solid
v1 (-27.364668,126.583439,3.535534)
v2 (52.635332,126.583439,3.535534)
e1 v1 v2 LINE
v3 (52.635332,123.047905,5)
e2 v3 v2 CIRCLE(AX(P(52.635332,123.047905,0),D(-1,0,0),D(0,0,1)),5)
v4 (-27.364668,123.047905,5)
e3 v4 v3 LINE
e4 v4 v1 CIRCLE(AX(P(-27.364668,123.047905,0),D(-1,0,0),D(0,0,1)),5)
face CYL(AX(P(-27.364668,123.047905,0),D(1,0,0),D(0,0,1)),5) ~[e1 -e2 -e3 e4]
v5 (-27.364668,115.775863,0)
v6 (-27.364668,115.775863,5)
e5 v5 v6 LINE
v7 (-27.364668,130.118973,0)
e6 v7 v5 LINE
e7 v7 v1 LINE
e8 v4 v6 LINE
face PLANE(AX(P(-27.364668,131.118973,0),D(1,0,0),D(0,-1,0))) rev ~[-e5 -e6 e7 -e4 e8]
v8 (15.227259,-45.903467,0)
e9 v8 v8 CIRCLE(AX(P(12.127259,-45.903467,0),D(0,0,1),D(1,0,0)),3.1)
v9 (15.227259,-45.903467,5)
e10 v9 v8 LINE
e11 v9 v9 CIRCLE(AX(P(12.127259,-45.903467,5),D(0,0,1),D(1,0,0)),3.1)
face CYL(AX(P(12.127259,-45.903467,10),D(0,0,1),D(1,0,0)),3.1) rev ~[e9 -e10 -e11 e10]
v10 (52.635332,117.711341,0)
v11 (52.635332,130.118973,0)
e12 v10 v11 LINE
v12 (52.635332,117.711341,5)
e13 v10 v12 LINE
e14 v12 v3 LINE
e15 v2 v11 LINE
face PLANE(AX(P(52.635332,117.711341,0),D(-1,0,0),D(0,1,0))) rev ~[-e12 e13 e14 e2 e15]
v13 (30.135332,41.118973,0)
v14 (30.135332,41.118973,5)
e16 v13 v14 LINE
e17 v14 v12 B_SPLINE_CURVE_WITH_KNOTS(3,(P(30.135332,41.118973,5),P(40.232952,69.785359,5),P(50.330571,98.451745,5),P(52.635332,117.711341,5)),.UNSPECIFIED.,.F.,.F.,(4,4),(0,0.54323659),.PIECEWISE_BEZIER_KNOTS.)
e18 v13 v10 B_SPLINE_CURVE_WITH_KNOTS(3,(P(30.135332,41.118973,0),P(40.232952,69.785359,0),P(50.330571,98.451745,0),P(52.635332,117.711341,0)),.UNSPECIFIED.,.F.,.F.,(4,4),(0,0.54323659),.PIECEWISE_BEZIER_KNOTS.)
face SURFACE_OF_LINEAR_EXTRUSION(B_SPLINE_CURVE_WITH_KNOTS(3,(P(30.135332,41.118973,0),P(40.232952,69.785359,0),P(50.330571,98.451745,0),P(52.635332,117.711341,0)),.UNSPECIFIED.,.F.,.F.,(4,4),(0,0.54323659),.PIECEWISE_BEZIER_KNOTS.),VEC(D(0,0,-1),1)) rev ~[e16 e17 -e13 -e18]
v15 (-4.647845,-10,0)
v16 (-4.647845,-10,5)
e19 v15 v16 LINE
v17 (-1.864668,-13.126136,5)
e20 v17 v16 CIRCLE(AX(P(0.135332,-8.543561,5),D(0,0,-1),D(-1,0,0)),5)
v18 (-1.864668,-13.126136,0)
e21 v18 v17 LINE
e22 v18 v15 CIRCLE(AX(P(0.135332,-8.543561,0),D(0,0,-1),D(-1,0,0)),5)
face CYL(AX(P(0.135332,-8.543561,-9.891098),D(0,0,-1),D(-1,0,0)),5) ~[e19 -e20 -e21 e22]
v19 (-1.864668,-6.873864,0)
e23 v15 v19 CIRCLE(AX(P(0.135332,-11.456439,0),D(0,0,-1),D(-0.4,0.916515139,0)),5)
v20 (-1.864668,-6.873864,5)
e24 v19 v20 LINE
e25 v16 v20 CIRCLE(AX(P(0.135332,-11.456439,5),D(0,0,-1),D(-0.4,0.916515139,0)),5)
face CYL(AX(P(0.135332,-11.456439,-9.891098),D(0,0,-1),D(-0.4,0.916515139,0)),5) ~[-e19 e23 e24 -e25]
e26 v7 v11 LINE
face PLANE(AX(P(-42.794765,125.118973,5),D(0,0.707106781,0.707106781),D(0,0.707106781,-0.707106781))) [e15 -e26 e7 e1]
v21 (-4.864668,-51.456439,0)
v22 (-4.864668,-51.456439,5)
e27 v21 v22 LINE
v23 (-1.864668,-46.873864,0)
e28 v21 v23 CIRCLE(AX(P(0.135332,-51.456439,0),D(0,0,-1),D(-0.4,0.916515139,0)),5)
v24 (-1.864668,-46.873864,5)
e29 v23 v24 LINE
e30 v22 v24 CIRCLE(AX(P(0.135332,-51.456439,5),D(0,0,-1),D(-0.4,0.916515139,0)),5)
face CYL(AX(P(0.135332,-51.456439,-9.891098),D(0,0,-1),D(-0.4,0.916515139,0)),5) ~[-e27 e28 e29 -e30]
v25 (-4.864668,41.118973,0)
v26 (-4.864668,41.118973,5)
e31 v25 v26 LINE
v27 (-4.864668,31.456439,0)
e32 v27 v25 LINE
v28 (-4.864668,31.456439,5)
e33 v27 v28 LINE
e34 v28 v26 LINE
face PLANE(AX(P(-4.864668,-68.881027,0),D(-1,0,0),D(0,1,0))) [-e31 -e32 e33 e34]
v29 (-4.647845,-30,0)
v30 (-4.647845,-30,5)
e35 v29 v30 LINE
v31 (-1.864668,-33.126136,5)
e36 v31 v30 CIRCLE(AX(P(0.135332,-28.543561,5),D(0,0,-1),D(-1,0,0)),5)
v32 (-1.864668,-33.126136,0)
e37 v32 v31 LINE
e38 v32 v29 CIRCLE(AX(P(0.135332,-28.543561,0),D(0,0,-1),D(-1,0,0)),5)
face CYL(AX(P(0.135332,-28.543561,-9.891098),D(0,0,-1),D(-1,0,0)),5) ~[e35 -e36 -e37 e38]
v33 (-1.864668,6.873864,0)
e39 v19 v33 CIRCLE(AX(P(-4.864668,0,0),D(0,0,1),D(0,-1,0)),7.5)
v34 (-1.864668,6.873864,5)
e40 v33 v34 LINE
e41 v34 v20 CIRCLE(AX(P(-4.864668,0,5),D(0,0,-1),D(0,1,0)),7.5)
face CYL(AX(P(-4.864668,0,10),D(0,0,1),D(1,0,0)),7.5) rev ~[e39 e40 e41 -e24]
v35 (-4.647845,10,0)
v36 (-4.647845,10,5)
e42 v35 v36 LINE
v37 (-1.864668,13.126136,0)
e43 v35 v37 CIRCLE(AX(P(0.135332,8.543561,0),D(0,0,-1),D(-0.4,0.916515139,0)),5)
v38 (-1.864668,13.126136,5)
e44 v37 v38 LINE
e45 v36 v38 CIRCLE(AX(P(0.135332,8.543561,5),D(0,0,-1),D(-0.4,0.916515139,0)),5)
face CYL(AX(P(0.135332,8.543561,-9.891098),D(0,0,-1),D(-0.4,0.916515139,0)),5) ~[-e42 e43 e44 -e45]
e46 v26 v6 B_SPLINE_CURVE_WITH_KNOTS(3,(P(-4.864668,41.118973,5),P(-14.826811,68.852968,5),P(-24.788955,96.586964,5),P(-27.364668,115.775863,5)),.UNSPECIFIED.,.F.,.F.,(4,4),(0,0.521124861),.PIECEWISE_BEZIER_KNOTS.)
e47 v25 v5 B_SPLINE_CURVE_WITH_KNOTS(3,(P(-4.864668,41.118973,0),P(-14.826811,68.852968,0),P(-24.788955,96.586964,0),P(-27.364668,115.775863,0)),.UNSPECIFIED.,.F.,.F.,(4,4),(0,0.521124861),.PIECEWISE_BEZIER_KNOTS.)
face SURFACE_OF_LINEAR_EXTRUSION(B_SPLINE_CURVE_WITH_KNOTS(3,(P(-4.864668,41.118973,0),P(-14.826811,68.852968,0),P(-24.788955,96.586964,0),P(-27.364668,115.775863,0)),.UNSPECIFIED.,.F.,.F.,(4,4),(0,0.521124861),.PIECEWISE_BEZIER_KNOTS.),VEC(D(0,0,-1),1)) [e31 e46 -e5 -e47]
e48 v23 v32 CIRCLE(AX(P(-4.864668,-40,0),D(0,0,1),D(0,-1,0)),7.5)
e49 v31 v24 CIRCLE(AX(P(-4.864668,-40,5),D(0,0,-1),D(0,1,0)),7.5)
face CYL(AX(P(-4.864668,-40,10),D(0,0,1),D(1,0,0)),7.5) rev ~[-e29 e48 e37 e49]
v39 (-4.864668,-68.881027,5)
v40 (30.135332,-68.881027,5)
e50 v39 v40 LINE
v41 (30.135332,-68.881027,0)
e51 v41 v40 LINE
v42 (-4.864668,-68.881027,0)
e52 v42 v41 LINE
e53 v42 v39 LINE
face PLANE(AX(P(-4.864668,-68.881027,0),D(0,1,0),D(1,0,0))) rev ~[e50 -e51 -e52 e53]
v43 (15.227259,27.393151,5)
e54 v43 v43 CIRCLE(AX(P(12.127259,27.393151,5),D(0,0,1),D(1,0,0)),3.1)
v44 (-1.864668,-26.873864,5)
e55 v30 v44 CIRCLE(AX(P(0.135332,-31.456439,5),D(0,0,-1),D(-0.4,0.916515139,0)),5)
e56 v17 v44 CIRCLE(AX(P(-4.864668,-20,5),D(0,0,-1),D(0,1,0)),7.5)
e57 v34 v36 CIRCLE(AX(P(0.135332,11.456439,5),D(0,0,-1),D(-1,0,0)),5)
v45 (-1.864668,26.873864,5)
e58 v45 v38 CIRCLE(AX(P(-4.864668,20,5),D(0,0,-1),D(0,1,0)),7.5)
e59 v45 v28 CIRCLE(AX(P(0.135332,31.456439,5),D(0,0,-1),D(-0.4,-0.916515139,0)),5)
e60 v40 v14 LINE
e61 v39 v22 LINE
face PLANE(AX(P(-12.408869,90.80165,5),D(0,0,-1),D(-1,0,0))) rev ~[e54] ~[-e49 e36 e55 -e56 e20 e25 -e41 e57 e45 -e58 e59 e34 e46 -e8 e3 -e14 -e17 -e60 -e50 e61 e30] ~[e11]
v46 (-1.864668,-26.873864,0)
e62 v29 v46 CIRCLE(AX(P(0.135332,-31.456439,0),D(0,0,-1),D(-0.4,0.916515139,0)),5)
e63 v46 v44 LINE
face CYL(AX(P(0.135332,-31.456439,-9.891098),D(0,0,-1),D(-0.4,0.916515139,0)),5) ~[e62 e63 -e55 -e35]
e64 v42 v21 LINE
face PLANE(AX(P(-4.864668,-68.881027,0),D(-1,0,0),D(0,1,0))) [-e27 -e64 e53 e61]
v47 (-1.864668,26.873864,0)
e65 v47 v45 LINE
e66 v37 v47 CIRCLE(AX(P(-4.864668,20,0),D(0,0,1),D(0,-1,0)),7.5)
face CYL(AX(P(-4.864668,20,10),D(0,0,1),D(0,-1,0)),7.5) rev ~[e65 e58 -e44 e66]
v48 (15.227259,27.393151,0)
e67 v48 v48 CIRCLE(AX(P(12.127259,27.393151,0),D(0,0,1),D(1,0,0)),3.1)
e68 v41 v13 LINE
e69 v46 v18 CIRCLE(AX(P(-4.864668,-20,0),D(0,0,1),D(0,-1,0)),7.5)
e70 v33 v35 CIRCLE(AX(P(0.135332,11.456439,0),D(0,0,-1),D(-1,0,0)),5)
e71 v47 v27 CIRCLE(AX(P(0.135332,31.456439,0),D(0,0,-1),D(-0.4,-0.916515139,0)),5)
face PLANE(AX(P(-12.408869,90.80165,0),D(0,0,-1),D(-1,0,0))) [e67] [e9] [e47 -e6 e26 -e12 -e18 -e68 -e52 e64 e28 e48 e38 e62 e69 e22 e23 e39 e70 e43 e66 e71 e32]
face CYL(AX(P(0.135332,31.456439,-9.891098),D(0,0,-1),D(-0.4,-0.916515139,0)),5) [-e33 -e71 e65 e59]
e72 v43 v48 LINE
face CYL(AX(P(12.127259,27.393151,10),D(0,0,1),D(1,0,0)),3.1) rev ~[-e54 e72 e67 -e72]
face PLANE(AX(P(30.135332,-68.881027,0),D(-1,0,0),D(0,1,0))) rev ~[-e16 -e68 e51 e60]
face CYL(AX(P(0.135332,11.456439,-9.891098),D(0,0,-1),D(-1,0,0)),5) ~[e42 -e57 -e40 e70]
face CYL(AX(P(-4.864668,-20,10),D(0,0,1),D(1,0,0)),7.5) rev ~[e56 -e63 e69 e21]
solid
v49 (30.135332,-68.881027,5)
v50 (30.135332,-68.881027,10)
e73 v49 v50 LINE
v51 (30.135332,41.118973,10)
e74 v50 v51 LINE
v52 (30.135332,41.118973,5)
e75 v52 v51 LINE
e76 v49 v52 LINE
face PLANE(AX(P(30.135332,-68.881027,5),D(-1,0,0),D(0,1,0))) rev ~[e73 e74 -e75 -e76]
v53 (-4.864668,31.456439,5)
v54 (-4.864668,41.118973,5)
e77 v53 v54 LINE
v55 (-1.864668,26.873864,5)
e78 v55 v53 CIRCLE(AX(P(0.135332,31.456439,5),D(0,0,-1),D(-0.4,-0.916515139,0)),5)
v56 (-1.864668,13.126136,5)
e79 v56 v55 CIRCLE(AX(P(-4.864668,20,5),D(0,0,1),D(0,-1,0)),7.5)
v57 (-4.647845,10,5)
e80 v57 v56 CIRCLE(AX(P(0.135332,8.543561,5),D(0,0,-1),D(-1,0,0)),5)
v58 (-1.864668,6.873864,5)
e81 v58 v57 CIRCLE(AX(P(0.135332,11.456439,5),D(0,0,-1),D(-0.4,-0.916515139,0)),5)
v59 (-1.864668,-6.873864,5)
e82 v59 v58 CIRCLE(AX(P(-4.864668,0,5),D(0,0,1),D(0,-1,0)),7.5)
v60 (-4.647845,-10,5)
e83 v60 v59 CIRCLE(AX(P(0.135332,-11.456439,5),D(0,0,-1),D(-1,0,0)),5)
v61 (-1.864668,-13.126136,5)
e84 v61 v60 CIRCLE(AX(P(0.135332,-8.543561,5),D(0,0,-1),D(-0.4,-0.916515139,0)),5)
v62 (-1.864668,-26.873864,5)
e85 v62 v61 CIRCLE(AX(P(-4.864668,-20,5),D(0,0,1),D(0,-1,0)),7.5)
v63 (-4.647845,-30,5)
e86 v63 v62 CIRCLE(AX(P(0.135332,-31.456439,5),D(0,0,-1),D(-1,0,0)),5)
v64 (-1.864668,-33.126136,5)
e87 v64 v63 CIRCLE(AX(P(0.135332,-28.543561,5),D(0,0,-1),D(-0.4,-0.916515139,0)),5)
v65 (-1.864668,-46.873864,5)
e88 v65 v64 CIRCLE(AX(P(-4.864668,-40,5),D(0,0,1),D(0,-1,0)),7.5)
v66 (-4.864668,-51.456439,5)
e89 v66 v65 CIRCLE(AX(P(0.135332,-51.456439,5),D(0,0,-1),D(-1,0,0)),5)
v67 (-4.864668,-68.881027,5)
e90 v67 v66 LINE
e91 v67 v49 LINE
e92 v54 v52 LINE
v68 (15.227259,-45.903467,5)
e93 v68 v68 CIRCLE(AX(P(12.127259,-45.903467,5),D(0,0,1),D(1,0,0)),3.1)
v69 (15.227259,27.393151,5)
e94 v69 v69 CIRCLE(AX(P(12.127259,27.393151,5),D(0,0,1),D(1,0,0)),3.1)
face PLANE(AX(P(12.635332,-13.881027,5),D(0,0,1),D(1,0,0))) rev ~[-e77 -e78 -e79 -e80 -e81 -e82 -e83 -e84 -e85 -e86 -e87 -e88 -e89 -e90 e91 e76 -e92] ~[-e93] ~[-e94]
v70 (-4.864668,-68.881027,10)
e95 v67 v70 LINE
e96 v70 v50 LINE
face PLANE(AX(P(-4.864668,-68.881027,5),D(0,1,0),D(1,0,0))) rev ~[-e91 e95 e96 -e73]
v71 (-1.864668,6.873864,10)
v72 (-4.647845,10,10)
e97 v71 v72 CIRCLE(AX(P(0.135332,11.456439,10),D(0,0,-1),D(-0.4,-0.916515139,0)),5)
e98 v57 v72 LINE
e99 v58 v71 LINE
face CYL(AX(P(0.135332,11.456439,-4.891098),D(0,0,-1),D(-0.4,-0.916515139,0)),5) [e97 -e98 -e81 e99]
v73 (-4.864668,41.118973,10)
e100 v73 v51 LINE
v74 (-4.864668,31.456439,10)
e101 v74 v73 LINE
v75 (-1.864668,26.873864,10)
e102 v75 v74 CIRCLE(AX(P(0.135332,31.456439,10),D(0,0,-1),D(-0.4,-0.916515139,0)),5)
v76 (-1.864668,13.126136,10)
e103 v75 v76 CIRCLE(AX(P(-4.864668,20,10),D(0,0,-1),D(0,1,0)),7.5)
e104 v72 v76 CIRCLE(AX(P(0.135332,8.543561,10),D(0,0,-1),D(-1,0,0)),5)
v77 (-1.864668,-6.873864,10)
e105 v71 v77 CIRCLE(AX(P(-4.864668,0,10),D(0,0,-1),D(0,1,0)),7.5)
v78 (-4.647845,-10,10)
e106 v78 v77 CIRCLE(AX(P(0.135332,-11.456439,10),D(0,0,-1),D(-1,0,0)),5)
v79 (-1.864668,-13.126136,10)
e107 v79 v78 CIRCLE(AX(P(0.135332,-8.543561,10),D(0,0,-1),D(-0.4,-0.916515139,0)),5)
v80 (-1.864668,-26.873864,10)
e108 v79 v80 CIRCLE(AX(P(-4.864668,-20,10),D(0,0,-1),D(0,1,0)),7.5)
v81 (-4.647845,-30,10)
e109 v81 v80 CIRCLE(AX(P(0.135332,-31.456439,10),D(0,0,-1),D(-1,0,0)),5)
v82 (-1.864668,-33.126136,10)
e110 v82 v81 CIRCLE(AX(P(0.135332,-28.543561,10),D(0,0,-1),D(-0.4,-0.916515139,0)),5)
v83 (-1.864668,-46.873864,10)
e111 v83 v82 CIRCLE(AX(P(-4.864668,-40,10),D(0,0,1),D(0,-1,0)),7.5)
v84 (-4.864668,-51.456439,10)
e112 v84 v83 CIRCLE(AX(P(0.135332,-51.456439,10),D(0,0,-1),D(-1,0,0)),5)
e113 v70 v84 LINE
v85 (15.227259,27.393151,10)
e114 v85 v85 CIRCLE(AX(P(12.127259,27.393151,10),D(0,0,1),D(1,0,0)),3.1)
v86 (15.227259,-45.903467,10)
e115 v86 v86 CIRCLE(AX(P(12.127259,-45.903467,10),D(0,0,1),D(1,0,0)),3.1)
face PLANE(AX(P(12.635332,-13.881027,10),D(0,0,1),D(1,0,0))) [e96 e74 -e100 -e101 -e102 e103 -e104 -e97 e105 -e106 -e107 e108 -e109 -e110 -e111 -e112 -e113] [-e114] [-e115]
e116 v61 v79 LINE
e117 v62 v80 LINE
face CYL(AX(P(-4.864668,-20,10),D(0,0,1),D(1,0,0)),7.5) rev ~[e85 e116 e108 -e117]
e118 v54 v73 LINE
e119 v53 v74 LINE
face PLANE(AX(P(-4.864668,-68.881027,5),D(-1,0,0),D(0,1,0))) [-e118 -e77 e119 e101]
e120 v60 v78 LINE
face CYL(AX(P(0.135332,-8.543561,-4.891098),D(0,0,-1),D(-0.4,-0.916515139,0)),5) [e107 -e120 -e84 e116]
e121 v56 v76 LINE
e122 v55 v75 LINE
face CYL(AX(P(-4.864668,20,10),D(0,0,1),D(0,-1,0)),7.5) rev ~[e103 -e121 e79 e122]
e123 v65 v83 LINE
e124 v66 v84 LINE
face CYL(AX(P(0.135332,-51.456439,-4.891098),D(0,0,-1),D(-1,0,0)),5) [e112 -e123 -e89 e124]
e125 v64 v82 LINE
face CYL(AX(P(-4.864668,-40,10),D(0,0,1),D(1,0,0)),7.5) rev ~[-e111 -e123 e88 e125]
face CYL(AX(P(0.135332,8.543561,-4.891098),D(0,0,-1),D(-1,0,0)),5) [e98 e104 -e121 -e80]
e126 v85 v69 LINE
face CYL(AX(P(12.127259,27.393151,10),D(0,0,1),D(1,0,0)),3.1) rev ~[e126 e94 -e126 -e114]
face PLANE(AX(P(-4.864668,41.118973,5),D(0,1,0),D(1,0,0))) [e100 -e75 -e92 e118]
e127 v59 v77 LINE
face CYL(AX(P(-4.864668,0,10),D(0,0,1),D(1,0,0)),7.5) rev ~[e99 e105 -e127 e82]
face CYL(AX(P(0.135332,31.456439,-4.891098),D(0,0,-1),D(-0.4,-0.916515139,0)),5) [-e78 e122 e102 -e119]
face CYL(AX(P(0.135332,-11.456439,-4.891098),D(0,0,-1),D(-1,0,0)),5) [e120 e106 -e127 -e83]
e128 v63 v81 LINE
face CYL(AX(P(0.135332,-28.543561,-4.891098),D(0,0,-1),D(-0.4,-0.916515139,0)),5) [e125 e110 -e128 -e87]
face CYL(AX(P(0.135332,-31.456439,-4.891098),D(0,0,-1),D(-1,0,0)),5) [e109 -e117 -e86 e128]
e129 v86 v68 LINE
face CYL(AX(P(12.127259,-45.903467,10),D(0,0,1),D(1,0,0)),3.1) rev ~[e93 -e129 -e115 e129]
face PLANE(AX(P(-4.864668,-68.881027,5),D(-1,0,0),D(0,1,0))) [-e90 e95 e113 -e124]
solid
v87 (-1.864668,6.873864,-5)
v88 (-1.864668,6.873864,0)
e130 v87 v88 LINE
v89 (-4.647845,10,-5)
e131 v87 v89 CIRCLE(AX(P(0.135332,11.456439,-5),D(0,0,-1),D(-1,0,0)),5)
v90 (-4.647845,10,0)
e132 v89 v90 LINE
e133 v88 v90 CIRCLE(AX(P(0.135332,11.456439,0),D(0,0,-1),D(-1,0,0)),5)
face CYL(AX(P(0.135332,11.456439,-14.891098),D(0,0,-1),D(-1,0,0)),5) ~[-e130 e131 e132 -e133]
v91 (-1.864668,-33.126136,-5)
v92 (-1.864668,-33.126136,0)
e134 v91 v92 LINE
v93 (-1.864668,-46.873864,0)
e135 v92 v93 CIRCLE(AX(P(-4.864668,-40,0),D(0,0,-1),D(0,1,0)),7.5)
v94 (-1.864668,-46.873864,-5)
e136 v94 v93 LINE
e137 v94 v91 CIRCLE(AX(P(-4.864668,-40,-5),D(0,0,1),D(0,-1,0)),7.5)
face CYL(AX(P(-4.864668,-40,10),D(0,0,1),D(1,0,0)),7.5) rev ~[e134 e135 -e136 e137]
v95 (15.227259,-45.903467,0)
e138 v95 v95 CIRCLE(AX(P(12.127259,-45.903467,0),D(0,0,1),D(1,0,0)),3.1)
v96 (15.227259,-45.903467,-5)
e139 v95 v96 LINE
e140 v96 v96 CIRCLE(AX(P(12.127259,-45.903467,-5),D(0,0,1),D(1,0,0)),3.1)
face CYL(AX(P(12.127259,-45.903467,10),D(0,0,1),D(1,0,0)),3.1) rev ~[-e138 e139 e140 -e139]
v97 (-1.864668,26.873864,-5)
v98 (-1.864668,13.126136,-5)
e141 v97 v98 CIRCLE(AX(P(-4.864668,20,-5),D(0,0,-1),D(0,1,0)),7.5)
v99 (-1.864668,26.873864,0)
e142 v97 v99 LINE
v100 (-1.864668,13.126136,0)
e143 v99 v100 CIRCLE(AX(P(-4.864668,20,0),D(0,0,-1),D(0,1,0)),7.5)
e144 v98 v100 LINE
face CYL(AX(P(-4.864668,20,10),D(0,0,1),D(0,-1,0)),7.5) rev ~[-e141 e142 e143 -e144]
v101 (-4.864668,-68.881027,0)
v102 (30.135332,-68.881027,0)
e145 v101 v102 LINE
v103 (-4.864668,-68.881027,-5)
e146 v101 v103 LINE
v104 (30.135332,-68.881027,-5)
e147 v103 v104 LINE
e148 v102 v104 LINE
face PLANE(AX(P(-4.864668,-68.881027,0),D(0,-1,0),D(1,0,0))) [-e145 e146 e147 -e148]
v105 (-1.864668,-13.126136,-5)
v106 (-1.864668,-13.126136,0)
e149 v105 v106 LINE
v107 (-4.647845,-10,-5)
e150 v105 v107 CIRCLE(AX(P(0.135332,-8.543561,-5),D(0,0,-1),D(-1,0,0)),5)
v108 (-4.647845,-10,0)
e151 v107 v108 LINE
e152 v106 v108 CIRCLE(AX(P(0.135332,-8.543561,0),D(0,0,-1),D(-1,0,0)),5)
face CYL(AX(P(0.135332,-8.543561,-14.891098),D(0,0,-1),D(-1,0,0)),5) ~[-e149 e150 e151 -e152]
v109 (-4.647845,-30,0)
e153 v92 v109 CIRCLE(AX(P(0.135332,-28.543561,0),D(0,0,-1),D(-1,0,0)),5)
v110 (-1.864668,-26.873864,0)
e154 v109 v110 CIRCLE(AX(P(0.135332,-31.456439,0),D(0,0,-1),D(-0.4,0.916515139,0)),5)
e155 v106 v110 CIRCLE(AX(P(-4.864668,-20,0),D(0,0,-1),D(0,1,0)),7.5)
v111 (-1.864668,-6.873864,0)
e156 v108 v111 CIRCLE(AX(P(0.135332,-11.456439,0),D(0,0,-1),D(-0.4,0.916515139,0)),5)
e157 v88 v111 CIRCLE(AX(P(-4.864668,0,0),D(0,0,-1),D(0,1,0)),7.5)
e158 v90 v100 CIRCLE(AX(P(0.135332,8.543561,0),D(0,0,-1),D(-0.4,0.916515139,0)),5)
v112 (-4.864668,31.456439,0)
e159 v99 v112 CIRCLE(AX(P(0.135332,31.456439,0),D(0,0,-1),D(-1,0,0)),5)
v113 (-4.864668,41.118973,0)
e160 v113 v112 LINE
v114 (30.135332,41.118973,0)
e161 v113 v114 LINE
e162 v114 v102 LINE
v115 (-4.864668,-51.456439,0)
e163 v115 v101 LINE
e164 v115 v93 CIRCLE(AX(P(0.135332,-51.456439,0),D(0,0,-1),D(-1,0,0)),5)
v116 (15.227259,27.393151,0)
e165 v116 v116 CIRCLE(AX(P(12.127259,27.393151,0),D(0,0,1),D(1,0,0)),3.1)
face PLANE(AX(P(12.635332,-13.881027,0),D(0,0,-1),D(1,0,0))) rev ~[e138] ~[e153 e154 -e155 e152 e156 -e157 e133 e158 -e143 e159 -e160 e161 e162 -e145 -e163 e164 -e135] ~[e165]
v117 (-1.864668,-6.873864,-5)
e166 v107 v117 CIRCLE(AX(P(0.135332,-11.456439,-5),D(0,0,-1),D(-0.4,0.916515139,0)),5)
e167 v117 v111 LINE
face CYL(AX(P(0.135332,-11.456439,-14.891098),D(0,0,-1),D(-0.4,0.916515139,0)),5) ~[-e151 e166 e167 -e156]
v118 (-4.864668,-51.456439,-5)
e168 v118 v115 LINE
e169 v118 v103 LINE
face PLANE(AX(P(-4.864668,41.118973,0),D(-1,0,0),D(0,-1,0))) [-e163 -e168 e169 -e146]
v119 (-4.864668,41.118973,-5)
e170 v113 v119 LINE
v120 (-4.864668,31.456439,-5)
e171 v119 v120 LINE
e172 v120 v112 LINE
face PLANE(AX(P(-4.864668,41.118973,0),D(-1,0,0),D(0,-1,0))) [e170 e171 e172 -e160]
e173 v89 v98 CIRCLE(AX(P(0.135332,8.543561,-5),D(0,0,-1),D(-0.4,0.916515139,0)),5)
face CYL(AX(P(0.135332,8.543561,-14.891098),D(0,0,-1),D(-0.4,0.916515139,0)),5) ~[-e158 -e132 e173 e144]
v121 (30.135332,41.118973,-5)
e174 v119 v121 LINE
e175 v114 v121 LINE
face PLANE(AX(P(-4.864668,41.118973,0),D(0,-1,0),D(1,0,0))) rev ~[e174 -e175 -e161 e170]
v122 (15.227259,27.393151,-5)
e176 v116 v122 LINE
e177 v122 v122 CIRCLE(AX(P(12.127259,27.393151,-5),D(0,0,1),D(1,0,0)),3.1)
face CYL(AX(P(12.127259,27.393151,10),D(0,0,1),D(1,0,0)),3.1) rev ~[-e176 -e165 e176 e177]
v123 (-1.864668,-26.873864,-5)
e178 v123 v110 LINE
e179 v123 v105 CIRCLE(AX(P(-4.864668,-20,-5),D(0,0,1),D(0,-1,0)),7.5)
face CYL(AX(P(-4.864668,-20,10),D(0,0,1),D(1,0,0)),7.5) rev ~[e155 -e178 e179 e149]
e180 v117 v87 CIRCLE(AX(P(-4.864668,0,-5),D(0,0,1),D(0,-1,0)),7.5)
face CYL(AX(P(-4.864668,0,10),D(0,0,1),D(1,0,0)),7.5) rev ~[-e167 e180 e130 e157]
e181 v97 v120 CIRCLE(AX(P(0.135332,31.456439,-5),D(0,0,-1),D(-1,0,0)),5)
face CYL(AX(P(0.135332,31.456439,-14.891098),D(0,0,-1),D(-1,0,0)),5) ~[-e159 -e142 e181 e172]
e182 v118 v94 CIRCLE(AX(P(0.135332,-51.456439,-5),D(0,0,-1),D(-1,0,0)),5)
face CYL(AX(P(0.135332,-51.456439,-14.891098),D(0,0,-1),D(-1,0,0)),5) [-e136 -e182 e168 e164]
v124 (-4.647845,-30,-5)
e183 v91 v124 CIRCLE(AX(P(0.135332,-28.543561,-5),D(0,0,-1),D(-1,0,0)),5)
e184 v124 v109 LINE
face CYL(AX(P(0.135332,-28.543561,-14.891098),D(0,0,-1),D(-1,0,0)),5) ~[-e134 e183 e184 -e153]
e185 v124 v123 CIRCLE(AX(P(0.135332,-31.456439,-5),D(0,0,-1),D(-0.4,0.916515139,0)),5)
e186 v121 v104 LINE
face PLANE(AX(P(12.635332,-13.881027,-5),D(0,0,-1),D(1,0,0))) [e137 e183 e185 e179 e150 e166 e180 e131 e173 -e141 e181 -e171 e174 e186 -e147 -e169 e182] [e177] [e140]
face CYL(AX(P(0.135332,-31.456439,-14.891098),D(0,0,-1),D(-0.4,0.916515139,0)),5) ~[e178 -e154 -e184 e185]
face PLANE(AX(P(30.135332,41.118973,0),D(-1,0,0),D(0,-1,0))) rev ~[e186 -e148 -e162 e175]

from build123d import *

# Parameters (mm, degrees)
F0_W          = 35
F0_H          = 90
F0_H_2        = 110
F1_DEPTH      = 5
F2_W          = 35
F2_H          = 110
F4_DEPTH      = 5
F3_W          = 35
F3_H          = 110
F5_DEPTH      = 5
F7_DEPTH      = 25
F6_R          = 7.5
F8_DEPTH      = 25
F9_T1_DEPTH   = 24.7821961869
F9_2_T1_DEPTH = 24.7821961869
F9_3_T1_DEPTH = 24.7821961869
F10_R         = 3.1
F11_DEPTH     = 25
F12_DEPTH     = 25
F13_T1_DEPTH  = 110.8601958556
F14_R         = 5


# Not quite as in the source:
# - a fillet or chamfer that OpenCascade refuses, or shapes differently, is made with other operations: its cross-section is extruded or revolved along the edge and cut away or added


with BuildPart() as f1:
    # F0 (on Top) → F1 (new body)
    with BuildSketch(Plane.XY):
        with BuildLine():
            add(Edge.make_bspline(
                [(-4.864667505, 41.1189725995), (-14.8268111493, 68.8529683822), (-24.7889547935, 96.5869641649), (-27.364667505, 115.7758631074)],
                knots=[0, 0, 0, 0, 0.5211248606, 0.5211248606, 0.5211248606, 0.5211248606], degree=3))
            Line((-4.864667505, 41.1189725995), (-4.864667505, 131.1189725995))
            Line((-4.864667505, 131.1189725995), (-27.364667505, 131.1189725995))
            Line((-27.364667505, 131.1189725995), (-27.364667505, 115.7758631074))
        make_face()
        with Locations((12.635332495, 86.1189725995)):
            Rectangle(F0_W, F0_H)
        with BuildLine():
            Line((30.135332495, 131.1189725995), (30.135332495, 41.1189725995))
            add(Edge.make_bspline(
                [(30.135332495, 41.1189725995), (40.232951817, 69.7853589458), (50.330571139, 98.4517452921), (52.635332495, 117.7113411352)],
                knots=[0, 0, 0, 0, 0.5432365903, 0.5432365903, 0.5432365903, 0.5432365903], degree=3))
            Line((52.635332495, 117.7113411352), (52.635332495, 131.1189725995))
            Line((52.635332495, 131.1189725995), (30.135332495, 131.1189725995))
        make_face()
        with Locations((12.635332495, -13.8810274005)):
            Rectangle(F0_W, F0_H_2)
    extrude(amount=F1_DEPTH)


with BuildPart() as f4:
    # F2 (on face) → F4 (new body)
    with BuildSketch(Plane.XY.offset(5)):
        with Locations((12.635332495, -13.8810274005)):
            Rectangle(F2_W, F2_H)
    extrude(amount=F4_DEPTH)


with BuildPart() as f5:
    # F3 (on face) → F5 (new body)
    with BuildSketch(Plane(origin=(0, 0, 0), x_dir=(1, 0, 0), z_dir=(0, 0, -1))):
        with Locations((12.635332495, 13.8810274005)):
            Rectangle(F3_W, F3_H)
    extrude(amount=F5_DEPTH)


with BuildPart() as f7_tool:
    # F6 (on face) → F7 (new body)
    with BuildSketch(Plane.XY.offset(10)):
        with BuildLine():
            ThreePointArc((-4.864667505, 12.5), (0.4386333539, 14.6966991411), (2.635332495, 20))
            ThreePointArc((2.635332495, 20), (0.4386333539, 25.3033008589), (-4.864667505, 27.5))
            Line((-4.864667505, 27.5), (-4.864667505, 12.5))
        make_face()
    extrude(amount=-F7_DEPTH)


with BuildPart() as f1_1:
    add(f1.part)

    # F7: cut by f7_tool
    add(f7_tool.part, mode=Mode.SUBTRACT)


with BuildPart() as f4_1:
    add(f4.part)

    # F7: cut by f7_tool
    add(f7_tool.part, mode=Mode.SUBTRACT)


with BuildPart() as f5_1:
    add(f5.part)

    # F7: cut by f7_tool
    add(f7_tool.part, mode=Mode.SUBTRACT)


with BuildPart() as f8_tool:
    # F6 (on face) → F8 (new body)
    with BuildSketch(Plane.XY.offset(10)):
        with Locations((-4.864667505, 20)):
            Circle(F6_R)
        with Locations((-4.864667505, 0)):
            Circle(F6_R)
        with Locations((-4.864667505, -20)):
            Circle(F6_R)
        with Locations((-4.864667505, -40)):
            Circle(F6_R)
    extrude(amount=-F8_DEPTH)


with BuildPart() as f1_2:
    add(f1_1.part)

    # F8: cut by f8_tool
    add(f8_tool.part, mode=Mode.SUBTRACT)

    # F9: fillet of radius 5 on 8 edges, made by hand

    # F9_s2 → F9_t1 (cut)
    with BuildSketch(Plane.XY.offset(-9.8910980935)):
        with BuildLine():
            ThreePointArc((-1.864667505, 26.8738635424), (-4.0479676377, 28.7178264499), (-4.864667505, 31.4564392374))
            Line((-4.864667505, 31.4564392374), (-4.864667505, 27.5))
            ThreePointArc((-4.864667505, 27.5), (-3.3323451774, 27.341797347), (-1.864667505, 26.8738635424))
        make_face()
        with BuildLine():
            ThreePointArc((-1.864667505, 13.1261364576), (-4.0479676377, 11.2821735501), (-4.864667505, 8.5435607626))
            Line((-4.864667505, 8.5435607626), (-4.864667505, 12.5))
            ThreePointArc((-4.864667505, 12.5), (-3.3323451774, 12.658202653), (-1.864667505, 13.1261364576))
        make_face()
        with BuildLine():
            ThreePointArc((-4.864667505, 11.4564392374), (-4.0479676377, 8.7178264499), (-1.864667505, 6.8738635424))
            ThreePointArc((-1.864667505, 6.8738635424), (-3.3323451774, 7.341797347), (-4.864667505, 7.5))
            Line((-4.864667505, 7.5), (-4.864667505, 11.4564392374))
        make_face()
        with BuildLine():
            ThreePointArc((-1.864667505, -6.8738635424), (-4.0479676377, -8.7178264499), (-4.864667505, -11.4564392374))
            Line((-4.864667505, -11.4564392374), (-4.864667505, -7.5))
            ThreePointArc((-4.864667505, -7.5), (-3.3323451774, -7.341797347), (-1.864667505, -6.8738635424))
        make_face()
        with BuildLine():
            ThreePointArc((-4.864667505, -8.5435607626), (-4.0479676377, -11.2821735501), (-1.864667505, -13.1261364576))
            ThreePointArc((-1.864667505, -13.1261364576), (-3.3323451774, -12.658202653), (-4.864667505, -12.5))
            Line((-4.864667505, -12.5), (-4.864667505, -8.5435607626))
        make_face()
        with BuildLine():
            ThreePointArc((-1.864667505, -26.8738635424), (-4.0479676377, -28.7178264499), (-4.864667505, -31.4564392374))
            Line((-4.864667505, -31.4564392374), (-4.864667505, -27.5))
            ThreePointArc((-4.864667505, -27.5), (-3.3323451774, -27.341797347), (-1.864667505, -26.8738635424))
        make_face()
        with BuildLine():
            ThreePointArc((-4.864667505, -28.5435607626), (-4.0479676377, -31.2821735501), (-1.864667505, -33.1261364576))
            ThreePointArc((-1.864667505, -33.1261364576), (-3.3323451774, -32.658202653), (-4.864667505, -32.5))
            Line((-4.864667505, -32.5), (-4.864667505, -28.5435607626))
        make_face()
        with BuildLine():
            ThreePointArc((-1.864667505, -46.8738635424), (-4.0479676377, -48.7178264499), (-4.864667505, -51.4564392374))
            Line((-4.864667505, -51.4564392374), (-4.864667505, -47.5))
            ThreePointArc((-4.864667505, -47.5), (-3.3323451774, -47.341797347), (-1.864667505, -46.8738635424))
        make_face()
    extrude(amount=F9_T1_DEPTH, mode=Mode.SUBTRACT)


with BuildPart() as f4_2:
    add(f4_1.part)

    # F8: cut by f8_tool
    add(f8_tool.part, mode=Mode.SUBTRACT)

    # F9#2: fillet of radius 5 on 8 edges, made by hand

    # F9_2_s2 → F9_2_t1 (cut)
    with BuildSketch(Plane.XY.offset(-4.8910980935)):
        with BuildLine():
            ThreePointArc((-1.864667505, 26.8738635424), (-4.0479676377, 28.7178264499), (-4.864667505, 31.4564392374))
            Line((-4.864667505, 31.4564392374), (-4.864667505, 27.5))
            ThreePointArc((-4.864667505, 27.5), (-3.3323451774, 27.341797347), (-1.864667505, 26.8738635424))
        make_face()
        with BuildLine():
            ThreePointArc((-4.864667505, 8.5435607626), (-4.0479676377, 11.2821735501), (-1.864667505, 13.1261364576))
            ThreePointArc((-1.864667505, 13.1261364576), (-3.3323451774, 12.658202653), (-4.864667505, 12.5))
            Line((-4.864667505, 12.5), (-4.864667505, 8.5435607626))
        make_face()
        with BuildLine():
            ThreePointArc((-4.864667505, -11.4564392374), (-4.0479676377, -8.7178264499), (-1.864667505, -6.8738635424))
            ThreePointArc((-1.864667505, -6.8738635424), (-3.3323451774, -7.341797347), (-4.864667505, -7.5))
            Line((-4.864667505, -7.5), (-4.864667505, -11.4564392374))
        make_face()
        with BuildLine():
            ThreePointArc((-1.864667505, 6.8738635424), (-4.0479676377, 8.7178264499), (-4.864667505, 11.4564392374))
            Line((-4.864667505, 11.4564392374), (-4.864667505, 7.5))
            ThreePointArc((-4.864667505, 7.5), (-3.3323451774, 7.341797347), (-1.864667505, 6.8738635424))
        make_face()
        with BuildLine():
            ThreePointArc((-4.864667505, -31.4564392374), (-4.0479676377, -28.7178264499), (-1.864667505, -26.8738635424))
            ThreePointArc((-1.864667505, -26.8738635424), (-3.3323451774, -27.341797347), (-4.864667505, -27.5))
            Line((-4.864667505, -27.5), (-4.864667505, -31.4564392374))
        make_face()
        with BuildLine():
            ThreePointArc((-1.864667505, -13.1261364576), (-4.0479676377, -11.2821735501), (-4.864667505, -8.5435607626))
            Line((-4.864667505, -8.5435607626), (-4.864667505, -12.5))
            ThreePointArc((-4.864667505, -12.5), (-3.3323451774, -12.658202653), (-1.864667505, -13.1261364576))
        make_face()
        with BuildLine():
            ThreePointArc((-4.864667505, -51.4564392374), (-4.0479676377, -48.7178264499), (-1.864667505, -46.8738635424))
            ThreePointArc((-1.864667505, -46.8738635424), (-3.3323451774, -47.341797347), (-4.864667505, -47.5))
            Line((-4.864667505, -47.5), (-4.864667505, -51.4564392374))
        make_face()
        with BuildLine():
            ThreePointArc((-1.864667505, -33.1261364576), (-4.0479676377, -31.2821735501), (-4.864667505, -28.5435607626))
            Line((-4.864667505, -28.5435607626), (-4.864667505, -32.5))
            ThreePointArc((-4.864667505, -32.5), (-3.3323451774, -32.658202653), (-1.864667505, -33.1261364576))
        make_face()
    extrude(amount=F9_2_T1_DEPTH, mode=Mode.SUBTRACT)


with BuildPart() as f5_2:
    add(f5_1.part)

    # F8: cut by f8_tool
    add(f8_tool.part, mode=Mode.SUBTRACT)

    # F9#3: fillet of radius 5 on 8 edges, made by hand

    # F9_3_s2 → F9_3_t1 (cut)
    with BuildSketch(Plane.XY.offset(-14.8910980935)):
        with BuildLine():
            ThreePointArc((-4.864667505, 31.4564392374), (-4.0479676377, 28.7178264499), (-1.864667505, 26.8738635424))
            ThreePointArc((-1.864667505, 26.8738635424), (-3.3323451774, 27.341797347), (-4.864667505, 27.5))
            Line((-4.864667505, 27.5), (-4.864667505, 31.4564392374))
        make_face()
        with BuildLine():
            ThreePointArc((-1.864667505, 13.1261364576), (-4.0479676377, 11.2821735501), (-4.864667505, 8.5435607626))
            Line((-4.864667505, 8.5435607626), (-4.864667505, 12.5))
            ThreePointArc((-4.864667505, 12.5), (-3.3323451774, 12.658202653), (-1.864667505, 13.1261364576))
        make_face()
        with BuildLine():
            ThreePointArc((-4.864667505, 11.4564392374), (-4.0479676377, 8.7178264499), (-1.864667505, 6.8738635424))
            ThreePointArc((-1.864667505, 6.8738635424), (-3.3323451774, 7.341797347), (-4.864667505, 7.5))
            Line((-4.864667505, 7.5), (-4.864667505, 11.4564392374))
        make_face()
        with BuildLine():
            ThreePointArc((-1.864667505, -6.8738635424), (-4.0479676377, -8.7178264499), (-4.864667505, -11.4564392374))
            Line((-4.864667505, -11.4564392374), (-4.864667505, -7.5))
            ThreePointArc((-4.864667505, -7.5), (-3.3323451774, -7.341797347), (-1.864667505, -6.8738635424))
        make_face()
        with BuildLine():
            ThreePointArc((-4.864667505, -8.5435607626), (-4.0479676377, -11.2821735501), (-1.864667505, -13.1261364576))
            ThreePointArc((-1.864667505, -13.1261364576), (-3.3323451774, -12.658202653), (-4.864667505, -12.5))
            Line((-4.864667505, -12.5), (-4.864667505, -8.5435607626))
        make_face()
        with BuildLine():
            ThreePointArc((-1.864667505, -26.8738635424), (-4.0479676377, -28.7178264499), (-4.864667505, -31.4564392374))
            Line((-4.864667505, -31.4564392374), (-4.864667505, -27.5))
            ThreePointArc((-4.864667505, -27.5), (-3.3323451774, -27.341797347), (-1.864667505, -26.8738635424))
        make_face()
        with BuildLine():
            ThreePointArc((-4.864667505, -51.4564392374), (-4.0479676377, -48.7178264499), (-1.864667505, -46.8738635424))
            ThreePointArc((-1.864667505, -46.8738635424), (-3.3323451774, -47.341797347), (-4.864667505, -47.5))
            Line((-4.864667505, -47.5), (-4.864667505, -51.4564392374))
        make_face()
        with BuildLine():
            ThreePointArc((-4.864667505, -28.5435607626), (-4.0479676377, -31.2821735501), (-1.864667505, -33.1261364576))
            ThreePointArc((-1.864667505, -33.1261364576), (-3.3323451774, -32.658202653), (-4.864667505, -32.5))
            Line((-4.864667505, -32.5), (-4.864667505, -28.5435607626))
        make_face()
    extrude(amount=F9_3_T1_DEPTH, mode=Mode.SUBTRACT)


with BuildPart() as f11_tool:
    # F10 (on face) → F11 (new body)
    with BuildSketch(Plane.XY.offset(10)):
        with Locations((12.1272588149, 27.3931510746)):
            Circle(F10_R)
    extrude(amount=-F11_DEPTH)


with BuildPart() as f1_3:
    add(f1_2.part)

    # F11: cut by f11_tool
    add(f11_tool.part, mode=Mode.SUBTRACT)


with BuildPart() as f4_3:
    add(f4_2.part)

    # F11: cut by f11_tool
    add(f11_tool.part, mode=Mode.SUBTRACT)


with BuildPart() as f5_3:
    add(f5_2.part)

    # F11: cut by f11_tool
    add(f11_tool.part, mode=Mode.SUBTRACT)


with BuildPart() as f12_tool:
    # F10 (on face) → F12 (new body)
    with BuildSketch(Plane.XY.offset(10)):
        with Locations((12.1272588149, 27.3931510746)):
            Circle(F10_R)
        with Locations((12.1272588149, -45.9034666419)):
            Circle(F10_R)
    extrude(amount=-F12_DEPTH)


with BuildPart() as f1_4:
    add(f1_3.part)

    # F12: cut by f12_tool
    add(f12_tool.part, mode=Mode.SUBTRACT)

    # F13: chamfer of 6 on 1 edges, made by hand

    # F13_s2 → F13_t1 (cut)
    with BuildSketch(Plane.YZ.offset(-42.7947654328)):
        Polygon((125.1189725995, 5), (131.1189725995, -1), (131.1189725995, 5), align=None)
    extrude(amount=F13_T1_DEPTH, mode=Mode.SUBTRACT)

    # F14
    f14_edges = [f1_4.edges().sort_by_distance(p)[0] for p in [
        (12.635332, 125.118973, 5),
    ]]
    fillet(f14_edges, radius=F14_R)


with BuildPart() as f4_4:
    add(f4_3.part)

    # F12: cut by f12_tool
    add(f12_tool.part, mode=Mode.SUBTRACT)


with BuildPart() as f5_4:
    add(f5_3.part)

    # F12: cut by f12_tool
    add(f12_tool.part, mode=Mode.SUBTRACT)


solid = Compound([f1_4.part, f4_4.part, f5_4.part])
